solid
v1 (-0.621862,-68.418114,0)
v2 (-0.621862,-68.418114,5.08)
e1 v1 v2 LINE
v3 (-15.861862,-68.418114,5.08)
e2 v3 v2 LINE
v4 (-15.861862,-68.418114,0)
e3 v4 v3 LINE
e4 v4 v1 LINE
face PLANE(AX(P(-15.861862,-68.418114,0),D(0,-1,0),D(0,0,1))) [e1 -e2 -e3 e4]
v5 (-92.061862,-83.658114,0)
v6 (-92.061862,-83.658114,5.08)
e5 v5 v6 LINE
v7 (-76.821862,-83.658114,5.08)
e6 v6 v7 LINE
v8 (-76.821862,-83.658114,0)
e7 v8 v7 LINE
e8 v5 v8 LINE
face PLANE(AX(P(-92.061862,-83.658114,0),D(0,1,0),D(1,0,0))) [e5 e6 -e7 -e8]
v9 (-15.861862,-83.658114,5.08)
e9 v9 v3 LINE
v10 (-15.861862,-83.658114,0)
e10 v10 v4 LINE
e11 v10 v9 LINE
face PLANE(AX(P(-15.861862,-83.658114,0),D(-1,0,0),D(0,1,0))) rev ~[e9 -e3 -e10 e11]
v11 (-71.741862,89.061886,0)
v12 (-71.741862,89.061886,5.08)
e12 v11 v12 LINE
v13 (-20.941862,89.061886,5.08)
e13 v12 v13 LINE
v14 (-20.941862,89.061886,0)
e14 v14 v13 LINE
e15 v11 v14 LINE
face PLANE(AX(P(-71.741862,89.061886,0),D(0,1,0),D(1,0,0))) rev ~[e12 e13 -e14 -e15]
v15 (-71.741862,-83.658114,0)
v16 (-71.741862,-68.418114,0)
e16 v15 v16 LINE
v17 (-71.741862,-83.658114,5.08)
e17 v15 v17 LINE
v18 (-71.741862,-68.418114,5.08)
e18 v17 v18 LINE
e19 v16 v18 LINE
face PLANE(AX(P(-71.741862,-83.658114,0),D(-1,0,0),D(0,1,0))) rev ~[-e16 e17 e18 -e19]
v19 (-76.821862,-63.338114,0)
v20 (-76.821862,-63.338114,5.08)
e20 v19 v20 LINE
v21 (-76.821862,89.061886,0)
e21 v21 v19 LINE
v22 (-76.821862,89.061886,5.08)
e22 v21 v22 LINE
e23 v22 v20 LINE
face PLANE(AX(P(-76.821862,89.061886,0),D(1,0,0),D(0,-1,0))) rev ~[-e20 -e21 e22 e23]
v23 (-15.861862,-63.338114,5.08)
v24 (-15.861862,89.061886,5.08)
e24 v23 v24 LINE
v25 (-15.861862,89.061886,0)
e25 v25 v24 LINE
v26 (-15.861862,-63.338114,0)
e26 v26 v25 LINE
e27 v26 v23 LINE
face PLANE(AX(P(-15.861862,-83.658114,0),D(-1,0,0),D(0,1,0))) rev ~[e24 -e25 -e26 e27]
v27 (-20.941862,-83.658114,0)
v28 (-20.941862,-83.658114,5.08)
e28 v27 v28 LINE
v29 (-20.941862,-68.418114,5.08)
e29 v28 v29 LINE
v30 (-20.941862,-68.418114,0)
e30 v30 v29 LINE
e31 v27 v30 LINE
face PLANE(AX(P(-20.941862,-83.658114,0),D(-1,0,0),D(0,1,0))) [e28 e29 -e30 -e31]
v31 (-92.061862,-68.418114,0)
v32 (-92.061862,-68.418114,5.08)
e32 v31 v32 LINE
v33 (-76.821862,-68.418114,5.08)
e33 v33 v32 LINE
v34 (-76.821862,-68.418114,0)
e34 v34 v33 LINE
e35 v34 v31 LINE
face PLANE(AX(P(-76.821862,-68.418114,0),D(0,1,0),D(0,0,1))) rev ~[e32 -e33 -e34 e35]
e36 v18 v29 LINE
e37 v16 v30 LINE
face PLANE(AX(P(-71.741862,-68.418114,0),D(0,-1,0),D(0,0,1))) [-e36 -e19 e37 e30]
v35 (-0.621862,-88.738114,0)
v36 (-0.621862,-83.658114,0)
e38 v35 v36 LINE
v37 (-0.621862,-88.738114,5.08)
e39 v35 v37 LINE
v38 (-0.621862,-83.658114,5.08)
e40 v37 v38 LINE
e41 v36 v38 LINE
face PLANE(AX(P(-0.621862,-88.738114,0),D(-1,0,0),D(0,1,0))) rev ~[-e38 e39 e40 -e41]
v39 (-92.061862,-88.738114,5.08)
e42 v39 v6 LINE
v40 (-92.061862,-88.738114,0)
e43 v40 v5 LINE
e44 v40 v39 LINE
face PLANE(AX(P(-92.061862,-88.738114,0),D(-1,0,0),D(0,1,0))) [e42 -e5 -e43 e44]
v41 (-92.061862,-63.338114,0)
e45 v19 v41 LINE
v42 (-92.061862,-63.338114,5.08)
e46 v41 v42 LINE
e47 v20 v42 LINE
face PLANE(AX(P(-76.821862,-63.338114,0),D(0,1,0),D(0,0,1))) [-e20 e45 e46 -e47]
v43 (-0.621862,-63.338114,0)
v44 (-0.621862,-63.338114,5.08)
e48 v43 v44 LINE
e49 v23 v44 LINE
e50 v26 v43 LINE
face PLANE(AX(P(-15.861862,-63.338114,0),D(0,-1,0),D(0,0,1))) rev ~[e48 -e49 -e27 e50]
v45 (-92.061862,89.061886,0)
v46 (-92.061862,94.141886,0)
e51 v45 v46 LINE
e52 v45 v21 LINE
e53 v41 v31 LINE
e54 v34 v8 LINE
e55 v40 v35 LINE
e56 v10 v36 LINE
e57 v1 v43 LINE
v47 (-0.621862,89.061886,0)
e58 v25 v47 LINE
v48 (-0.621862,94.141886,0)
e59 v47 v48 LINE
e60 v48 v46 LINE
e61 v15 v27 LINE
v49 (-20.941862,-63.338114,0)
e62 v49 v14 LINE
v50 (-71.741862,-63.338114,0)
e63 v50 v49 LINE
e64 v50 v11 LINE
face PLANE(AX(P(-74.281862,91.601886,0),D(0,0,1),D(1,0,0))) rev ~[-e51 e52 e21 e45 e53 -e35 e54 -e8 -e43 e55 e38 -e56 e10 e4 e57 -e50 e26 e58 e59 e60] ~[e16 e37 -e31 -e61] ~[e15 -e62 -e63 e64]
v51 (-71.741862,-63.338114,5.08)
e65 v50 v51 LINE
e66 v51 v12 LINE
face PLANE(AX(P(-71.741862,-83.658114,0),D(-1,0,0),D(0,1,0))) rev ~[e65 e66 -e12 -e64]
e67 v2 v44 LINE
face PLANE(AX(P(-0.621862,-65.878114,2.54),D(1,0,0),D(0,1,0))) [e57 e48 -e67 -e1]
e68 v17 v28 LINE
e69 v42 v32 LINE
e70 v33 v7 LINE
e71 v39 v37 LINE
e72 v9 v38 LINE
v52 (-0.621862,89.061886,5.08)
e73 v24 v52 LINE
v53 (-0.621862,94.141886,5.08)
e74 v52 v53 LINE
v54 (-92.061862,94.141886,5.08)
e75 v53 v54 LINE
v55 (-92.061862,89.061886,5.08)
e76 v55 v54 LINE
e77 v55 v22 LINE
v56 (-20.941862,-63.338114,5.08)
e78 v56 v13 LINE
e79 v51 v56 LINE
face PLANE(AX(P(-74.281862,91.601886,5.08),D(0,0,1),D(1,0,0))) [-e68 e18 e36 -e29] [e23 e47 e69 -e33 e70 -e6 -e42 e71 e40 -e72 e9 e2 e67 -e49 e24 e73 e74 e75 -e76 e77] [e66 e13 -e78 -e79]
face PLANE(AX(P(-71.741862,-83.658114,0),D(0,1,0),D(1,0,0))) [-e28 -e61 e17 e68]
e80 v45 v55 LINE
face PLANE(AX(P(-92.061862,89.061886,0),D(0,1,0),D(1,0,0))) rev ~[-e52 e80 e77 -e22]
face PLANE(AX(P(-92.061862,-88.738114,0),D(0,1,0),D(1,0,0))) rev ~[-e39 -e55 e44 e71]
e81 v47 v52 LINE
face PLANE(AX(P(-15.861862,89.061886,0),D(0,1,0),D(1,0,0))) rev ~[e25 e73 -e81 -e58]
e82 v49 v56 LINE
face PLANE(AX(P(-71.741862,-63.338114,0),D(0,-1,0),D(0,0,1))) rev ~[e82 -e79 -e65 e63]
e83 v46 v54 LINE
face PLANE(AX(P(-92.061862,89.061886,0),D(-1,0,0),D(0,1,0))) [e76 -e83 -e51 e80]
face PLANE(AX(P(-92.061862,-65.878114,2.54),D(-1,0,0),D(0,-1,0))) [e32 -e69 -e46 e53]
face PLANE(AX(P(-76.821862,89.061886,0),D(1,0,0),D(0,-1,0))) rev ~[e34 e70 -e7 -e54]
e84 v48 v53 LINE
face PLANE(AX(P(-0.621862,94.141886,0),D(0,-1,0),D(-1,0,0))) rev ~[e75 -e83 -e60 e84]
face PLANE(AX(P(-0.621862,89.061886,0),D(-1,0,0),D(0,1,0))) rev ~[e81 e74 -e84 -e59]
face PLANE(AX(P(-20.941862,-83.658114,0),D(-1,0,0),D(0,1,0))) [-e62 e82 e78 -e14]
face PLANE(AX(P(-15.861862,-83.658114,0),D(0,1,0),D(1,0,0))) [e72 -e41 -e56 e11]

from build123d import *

# Parameters (mm, degrees)
F0_W     = 5.08
F0_H     = 5.08
F0_W_2   = 15.24
F0_W_3   = 50.8
F0_H_2   = 172.72
F1_DEPTH = 5.08
F2_W     = 5.08
F2_H     = 5.08
F3_DEPTH = 50.8
F4_W     = 5.08
F4_H     = 5.08
F5_DEPTH = 15.24
F6_W     = 5.08
F6_H     = 5.08
F7_DEPTH = 15.24


with BuildPart() as f1:
    # F0 (on Top) → F1 (new body)
    with BuildSketch(Plane.XY):
        with Locations((-74.2818623495, 91.6018860722)):
            Rectangle(F0_W, F0_H)
        with Locations((-84.4418623495, 91.6018860722)):
            Rectangle(F0_W_2, F0_H)
        with Locations((-46.3418623495, 91.6018860722)):
            Rectangle(F0_W_3, F0_H)
        with Locations((-74.2818623495, 2.7018860722)):
            Rectangle(F0_W, F0_H_2)
        with Locations((-18.4018623495, 91.6018860722)):
            Rectangle(F0_W, F0_H)
        with Locations((-74.2818623495, -86.1981139278)):
            Rectangle(F0_W, F0_H)
        with Locations((-84.4418623495, -86.1981139278)):
            Rectangle(F0_W_2, F0_H)
        with Locations((-46.3418623495, -86.1981139278)):
            Rectangle(F0_W_3, F0_H)
        with Locations((-18.4018623495, 2.7018860722)):
            Rectangle(F0_W, F0_H_2)
        with Locations((-8.2418623495, 91.6018860722)):
            Rectangle(F0_W_2, F0_H)
        with Locations((-18.4018623495, -86.1981139278)):
            Rectangle(F0_W, F0_H)
        with Locations((-8.2418623495, -86.1981139278)):
            Rectangle(F0_W_2, F0_H)
    extrude(amount=F1_DEPTH)

    # F2 (on face) → F3 (join)
    with BuildSketch(Plane.YZ.offset(-71.7418623495)):
        with Locations((-65.8781139278, 2.54)):
            Rectangle(F2_W, F2_H)
    extrude(amount=F3_DEPTH)

    # F4 (on face) → F5 (join)
    with BuildSketch(Plane.YZ.offset(-15.8618623495)):
        with Locations((-65.8781139278, 2.54)):
            Rectangle(F4_W, F4_H)
    extrude(amount=F5_DEPTH)

    # F6 (on face) → F7 (join)
    with BuildSketch(Plane(origin=(-76.8218623495, 0, 0), x_dir=(0, -1, 0), z_dir=(-1, 0, 0))):
        with Locations((65.8781139278, 2.54)):
            Rectangle(F6_W, F6_H)
    extrude(amount=F7_DEPTH)


solid = f1.part
